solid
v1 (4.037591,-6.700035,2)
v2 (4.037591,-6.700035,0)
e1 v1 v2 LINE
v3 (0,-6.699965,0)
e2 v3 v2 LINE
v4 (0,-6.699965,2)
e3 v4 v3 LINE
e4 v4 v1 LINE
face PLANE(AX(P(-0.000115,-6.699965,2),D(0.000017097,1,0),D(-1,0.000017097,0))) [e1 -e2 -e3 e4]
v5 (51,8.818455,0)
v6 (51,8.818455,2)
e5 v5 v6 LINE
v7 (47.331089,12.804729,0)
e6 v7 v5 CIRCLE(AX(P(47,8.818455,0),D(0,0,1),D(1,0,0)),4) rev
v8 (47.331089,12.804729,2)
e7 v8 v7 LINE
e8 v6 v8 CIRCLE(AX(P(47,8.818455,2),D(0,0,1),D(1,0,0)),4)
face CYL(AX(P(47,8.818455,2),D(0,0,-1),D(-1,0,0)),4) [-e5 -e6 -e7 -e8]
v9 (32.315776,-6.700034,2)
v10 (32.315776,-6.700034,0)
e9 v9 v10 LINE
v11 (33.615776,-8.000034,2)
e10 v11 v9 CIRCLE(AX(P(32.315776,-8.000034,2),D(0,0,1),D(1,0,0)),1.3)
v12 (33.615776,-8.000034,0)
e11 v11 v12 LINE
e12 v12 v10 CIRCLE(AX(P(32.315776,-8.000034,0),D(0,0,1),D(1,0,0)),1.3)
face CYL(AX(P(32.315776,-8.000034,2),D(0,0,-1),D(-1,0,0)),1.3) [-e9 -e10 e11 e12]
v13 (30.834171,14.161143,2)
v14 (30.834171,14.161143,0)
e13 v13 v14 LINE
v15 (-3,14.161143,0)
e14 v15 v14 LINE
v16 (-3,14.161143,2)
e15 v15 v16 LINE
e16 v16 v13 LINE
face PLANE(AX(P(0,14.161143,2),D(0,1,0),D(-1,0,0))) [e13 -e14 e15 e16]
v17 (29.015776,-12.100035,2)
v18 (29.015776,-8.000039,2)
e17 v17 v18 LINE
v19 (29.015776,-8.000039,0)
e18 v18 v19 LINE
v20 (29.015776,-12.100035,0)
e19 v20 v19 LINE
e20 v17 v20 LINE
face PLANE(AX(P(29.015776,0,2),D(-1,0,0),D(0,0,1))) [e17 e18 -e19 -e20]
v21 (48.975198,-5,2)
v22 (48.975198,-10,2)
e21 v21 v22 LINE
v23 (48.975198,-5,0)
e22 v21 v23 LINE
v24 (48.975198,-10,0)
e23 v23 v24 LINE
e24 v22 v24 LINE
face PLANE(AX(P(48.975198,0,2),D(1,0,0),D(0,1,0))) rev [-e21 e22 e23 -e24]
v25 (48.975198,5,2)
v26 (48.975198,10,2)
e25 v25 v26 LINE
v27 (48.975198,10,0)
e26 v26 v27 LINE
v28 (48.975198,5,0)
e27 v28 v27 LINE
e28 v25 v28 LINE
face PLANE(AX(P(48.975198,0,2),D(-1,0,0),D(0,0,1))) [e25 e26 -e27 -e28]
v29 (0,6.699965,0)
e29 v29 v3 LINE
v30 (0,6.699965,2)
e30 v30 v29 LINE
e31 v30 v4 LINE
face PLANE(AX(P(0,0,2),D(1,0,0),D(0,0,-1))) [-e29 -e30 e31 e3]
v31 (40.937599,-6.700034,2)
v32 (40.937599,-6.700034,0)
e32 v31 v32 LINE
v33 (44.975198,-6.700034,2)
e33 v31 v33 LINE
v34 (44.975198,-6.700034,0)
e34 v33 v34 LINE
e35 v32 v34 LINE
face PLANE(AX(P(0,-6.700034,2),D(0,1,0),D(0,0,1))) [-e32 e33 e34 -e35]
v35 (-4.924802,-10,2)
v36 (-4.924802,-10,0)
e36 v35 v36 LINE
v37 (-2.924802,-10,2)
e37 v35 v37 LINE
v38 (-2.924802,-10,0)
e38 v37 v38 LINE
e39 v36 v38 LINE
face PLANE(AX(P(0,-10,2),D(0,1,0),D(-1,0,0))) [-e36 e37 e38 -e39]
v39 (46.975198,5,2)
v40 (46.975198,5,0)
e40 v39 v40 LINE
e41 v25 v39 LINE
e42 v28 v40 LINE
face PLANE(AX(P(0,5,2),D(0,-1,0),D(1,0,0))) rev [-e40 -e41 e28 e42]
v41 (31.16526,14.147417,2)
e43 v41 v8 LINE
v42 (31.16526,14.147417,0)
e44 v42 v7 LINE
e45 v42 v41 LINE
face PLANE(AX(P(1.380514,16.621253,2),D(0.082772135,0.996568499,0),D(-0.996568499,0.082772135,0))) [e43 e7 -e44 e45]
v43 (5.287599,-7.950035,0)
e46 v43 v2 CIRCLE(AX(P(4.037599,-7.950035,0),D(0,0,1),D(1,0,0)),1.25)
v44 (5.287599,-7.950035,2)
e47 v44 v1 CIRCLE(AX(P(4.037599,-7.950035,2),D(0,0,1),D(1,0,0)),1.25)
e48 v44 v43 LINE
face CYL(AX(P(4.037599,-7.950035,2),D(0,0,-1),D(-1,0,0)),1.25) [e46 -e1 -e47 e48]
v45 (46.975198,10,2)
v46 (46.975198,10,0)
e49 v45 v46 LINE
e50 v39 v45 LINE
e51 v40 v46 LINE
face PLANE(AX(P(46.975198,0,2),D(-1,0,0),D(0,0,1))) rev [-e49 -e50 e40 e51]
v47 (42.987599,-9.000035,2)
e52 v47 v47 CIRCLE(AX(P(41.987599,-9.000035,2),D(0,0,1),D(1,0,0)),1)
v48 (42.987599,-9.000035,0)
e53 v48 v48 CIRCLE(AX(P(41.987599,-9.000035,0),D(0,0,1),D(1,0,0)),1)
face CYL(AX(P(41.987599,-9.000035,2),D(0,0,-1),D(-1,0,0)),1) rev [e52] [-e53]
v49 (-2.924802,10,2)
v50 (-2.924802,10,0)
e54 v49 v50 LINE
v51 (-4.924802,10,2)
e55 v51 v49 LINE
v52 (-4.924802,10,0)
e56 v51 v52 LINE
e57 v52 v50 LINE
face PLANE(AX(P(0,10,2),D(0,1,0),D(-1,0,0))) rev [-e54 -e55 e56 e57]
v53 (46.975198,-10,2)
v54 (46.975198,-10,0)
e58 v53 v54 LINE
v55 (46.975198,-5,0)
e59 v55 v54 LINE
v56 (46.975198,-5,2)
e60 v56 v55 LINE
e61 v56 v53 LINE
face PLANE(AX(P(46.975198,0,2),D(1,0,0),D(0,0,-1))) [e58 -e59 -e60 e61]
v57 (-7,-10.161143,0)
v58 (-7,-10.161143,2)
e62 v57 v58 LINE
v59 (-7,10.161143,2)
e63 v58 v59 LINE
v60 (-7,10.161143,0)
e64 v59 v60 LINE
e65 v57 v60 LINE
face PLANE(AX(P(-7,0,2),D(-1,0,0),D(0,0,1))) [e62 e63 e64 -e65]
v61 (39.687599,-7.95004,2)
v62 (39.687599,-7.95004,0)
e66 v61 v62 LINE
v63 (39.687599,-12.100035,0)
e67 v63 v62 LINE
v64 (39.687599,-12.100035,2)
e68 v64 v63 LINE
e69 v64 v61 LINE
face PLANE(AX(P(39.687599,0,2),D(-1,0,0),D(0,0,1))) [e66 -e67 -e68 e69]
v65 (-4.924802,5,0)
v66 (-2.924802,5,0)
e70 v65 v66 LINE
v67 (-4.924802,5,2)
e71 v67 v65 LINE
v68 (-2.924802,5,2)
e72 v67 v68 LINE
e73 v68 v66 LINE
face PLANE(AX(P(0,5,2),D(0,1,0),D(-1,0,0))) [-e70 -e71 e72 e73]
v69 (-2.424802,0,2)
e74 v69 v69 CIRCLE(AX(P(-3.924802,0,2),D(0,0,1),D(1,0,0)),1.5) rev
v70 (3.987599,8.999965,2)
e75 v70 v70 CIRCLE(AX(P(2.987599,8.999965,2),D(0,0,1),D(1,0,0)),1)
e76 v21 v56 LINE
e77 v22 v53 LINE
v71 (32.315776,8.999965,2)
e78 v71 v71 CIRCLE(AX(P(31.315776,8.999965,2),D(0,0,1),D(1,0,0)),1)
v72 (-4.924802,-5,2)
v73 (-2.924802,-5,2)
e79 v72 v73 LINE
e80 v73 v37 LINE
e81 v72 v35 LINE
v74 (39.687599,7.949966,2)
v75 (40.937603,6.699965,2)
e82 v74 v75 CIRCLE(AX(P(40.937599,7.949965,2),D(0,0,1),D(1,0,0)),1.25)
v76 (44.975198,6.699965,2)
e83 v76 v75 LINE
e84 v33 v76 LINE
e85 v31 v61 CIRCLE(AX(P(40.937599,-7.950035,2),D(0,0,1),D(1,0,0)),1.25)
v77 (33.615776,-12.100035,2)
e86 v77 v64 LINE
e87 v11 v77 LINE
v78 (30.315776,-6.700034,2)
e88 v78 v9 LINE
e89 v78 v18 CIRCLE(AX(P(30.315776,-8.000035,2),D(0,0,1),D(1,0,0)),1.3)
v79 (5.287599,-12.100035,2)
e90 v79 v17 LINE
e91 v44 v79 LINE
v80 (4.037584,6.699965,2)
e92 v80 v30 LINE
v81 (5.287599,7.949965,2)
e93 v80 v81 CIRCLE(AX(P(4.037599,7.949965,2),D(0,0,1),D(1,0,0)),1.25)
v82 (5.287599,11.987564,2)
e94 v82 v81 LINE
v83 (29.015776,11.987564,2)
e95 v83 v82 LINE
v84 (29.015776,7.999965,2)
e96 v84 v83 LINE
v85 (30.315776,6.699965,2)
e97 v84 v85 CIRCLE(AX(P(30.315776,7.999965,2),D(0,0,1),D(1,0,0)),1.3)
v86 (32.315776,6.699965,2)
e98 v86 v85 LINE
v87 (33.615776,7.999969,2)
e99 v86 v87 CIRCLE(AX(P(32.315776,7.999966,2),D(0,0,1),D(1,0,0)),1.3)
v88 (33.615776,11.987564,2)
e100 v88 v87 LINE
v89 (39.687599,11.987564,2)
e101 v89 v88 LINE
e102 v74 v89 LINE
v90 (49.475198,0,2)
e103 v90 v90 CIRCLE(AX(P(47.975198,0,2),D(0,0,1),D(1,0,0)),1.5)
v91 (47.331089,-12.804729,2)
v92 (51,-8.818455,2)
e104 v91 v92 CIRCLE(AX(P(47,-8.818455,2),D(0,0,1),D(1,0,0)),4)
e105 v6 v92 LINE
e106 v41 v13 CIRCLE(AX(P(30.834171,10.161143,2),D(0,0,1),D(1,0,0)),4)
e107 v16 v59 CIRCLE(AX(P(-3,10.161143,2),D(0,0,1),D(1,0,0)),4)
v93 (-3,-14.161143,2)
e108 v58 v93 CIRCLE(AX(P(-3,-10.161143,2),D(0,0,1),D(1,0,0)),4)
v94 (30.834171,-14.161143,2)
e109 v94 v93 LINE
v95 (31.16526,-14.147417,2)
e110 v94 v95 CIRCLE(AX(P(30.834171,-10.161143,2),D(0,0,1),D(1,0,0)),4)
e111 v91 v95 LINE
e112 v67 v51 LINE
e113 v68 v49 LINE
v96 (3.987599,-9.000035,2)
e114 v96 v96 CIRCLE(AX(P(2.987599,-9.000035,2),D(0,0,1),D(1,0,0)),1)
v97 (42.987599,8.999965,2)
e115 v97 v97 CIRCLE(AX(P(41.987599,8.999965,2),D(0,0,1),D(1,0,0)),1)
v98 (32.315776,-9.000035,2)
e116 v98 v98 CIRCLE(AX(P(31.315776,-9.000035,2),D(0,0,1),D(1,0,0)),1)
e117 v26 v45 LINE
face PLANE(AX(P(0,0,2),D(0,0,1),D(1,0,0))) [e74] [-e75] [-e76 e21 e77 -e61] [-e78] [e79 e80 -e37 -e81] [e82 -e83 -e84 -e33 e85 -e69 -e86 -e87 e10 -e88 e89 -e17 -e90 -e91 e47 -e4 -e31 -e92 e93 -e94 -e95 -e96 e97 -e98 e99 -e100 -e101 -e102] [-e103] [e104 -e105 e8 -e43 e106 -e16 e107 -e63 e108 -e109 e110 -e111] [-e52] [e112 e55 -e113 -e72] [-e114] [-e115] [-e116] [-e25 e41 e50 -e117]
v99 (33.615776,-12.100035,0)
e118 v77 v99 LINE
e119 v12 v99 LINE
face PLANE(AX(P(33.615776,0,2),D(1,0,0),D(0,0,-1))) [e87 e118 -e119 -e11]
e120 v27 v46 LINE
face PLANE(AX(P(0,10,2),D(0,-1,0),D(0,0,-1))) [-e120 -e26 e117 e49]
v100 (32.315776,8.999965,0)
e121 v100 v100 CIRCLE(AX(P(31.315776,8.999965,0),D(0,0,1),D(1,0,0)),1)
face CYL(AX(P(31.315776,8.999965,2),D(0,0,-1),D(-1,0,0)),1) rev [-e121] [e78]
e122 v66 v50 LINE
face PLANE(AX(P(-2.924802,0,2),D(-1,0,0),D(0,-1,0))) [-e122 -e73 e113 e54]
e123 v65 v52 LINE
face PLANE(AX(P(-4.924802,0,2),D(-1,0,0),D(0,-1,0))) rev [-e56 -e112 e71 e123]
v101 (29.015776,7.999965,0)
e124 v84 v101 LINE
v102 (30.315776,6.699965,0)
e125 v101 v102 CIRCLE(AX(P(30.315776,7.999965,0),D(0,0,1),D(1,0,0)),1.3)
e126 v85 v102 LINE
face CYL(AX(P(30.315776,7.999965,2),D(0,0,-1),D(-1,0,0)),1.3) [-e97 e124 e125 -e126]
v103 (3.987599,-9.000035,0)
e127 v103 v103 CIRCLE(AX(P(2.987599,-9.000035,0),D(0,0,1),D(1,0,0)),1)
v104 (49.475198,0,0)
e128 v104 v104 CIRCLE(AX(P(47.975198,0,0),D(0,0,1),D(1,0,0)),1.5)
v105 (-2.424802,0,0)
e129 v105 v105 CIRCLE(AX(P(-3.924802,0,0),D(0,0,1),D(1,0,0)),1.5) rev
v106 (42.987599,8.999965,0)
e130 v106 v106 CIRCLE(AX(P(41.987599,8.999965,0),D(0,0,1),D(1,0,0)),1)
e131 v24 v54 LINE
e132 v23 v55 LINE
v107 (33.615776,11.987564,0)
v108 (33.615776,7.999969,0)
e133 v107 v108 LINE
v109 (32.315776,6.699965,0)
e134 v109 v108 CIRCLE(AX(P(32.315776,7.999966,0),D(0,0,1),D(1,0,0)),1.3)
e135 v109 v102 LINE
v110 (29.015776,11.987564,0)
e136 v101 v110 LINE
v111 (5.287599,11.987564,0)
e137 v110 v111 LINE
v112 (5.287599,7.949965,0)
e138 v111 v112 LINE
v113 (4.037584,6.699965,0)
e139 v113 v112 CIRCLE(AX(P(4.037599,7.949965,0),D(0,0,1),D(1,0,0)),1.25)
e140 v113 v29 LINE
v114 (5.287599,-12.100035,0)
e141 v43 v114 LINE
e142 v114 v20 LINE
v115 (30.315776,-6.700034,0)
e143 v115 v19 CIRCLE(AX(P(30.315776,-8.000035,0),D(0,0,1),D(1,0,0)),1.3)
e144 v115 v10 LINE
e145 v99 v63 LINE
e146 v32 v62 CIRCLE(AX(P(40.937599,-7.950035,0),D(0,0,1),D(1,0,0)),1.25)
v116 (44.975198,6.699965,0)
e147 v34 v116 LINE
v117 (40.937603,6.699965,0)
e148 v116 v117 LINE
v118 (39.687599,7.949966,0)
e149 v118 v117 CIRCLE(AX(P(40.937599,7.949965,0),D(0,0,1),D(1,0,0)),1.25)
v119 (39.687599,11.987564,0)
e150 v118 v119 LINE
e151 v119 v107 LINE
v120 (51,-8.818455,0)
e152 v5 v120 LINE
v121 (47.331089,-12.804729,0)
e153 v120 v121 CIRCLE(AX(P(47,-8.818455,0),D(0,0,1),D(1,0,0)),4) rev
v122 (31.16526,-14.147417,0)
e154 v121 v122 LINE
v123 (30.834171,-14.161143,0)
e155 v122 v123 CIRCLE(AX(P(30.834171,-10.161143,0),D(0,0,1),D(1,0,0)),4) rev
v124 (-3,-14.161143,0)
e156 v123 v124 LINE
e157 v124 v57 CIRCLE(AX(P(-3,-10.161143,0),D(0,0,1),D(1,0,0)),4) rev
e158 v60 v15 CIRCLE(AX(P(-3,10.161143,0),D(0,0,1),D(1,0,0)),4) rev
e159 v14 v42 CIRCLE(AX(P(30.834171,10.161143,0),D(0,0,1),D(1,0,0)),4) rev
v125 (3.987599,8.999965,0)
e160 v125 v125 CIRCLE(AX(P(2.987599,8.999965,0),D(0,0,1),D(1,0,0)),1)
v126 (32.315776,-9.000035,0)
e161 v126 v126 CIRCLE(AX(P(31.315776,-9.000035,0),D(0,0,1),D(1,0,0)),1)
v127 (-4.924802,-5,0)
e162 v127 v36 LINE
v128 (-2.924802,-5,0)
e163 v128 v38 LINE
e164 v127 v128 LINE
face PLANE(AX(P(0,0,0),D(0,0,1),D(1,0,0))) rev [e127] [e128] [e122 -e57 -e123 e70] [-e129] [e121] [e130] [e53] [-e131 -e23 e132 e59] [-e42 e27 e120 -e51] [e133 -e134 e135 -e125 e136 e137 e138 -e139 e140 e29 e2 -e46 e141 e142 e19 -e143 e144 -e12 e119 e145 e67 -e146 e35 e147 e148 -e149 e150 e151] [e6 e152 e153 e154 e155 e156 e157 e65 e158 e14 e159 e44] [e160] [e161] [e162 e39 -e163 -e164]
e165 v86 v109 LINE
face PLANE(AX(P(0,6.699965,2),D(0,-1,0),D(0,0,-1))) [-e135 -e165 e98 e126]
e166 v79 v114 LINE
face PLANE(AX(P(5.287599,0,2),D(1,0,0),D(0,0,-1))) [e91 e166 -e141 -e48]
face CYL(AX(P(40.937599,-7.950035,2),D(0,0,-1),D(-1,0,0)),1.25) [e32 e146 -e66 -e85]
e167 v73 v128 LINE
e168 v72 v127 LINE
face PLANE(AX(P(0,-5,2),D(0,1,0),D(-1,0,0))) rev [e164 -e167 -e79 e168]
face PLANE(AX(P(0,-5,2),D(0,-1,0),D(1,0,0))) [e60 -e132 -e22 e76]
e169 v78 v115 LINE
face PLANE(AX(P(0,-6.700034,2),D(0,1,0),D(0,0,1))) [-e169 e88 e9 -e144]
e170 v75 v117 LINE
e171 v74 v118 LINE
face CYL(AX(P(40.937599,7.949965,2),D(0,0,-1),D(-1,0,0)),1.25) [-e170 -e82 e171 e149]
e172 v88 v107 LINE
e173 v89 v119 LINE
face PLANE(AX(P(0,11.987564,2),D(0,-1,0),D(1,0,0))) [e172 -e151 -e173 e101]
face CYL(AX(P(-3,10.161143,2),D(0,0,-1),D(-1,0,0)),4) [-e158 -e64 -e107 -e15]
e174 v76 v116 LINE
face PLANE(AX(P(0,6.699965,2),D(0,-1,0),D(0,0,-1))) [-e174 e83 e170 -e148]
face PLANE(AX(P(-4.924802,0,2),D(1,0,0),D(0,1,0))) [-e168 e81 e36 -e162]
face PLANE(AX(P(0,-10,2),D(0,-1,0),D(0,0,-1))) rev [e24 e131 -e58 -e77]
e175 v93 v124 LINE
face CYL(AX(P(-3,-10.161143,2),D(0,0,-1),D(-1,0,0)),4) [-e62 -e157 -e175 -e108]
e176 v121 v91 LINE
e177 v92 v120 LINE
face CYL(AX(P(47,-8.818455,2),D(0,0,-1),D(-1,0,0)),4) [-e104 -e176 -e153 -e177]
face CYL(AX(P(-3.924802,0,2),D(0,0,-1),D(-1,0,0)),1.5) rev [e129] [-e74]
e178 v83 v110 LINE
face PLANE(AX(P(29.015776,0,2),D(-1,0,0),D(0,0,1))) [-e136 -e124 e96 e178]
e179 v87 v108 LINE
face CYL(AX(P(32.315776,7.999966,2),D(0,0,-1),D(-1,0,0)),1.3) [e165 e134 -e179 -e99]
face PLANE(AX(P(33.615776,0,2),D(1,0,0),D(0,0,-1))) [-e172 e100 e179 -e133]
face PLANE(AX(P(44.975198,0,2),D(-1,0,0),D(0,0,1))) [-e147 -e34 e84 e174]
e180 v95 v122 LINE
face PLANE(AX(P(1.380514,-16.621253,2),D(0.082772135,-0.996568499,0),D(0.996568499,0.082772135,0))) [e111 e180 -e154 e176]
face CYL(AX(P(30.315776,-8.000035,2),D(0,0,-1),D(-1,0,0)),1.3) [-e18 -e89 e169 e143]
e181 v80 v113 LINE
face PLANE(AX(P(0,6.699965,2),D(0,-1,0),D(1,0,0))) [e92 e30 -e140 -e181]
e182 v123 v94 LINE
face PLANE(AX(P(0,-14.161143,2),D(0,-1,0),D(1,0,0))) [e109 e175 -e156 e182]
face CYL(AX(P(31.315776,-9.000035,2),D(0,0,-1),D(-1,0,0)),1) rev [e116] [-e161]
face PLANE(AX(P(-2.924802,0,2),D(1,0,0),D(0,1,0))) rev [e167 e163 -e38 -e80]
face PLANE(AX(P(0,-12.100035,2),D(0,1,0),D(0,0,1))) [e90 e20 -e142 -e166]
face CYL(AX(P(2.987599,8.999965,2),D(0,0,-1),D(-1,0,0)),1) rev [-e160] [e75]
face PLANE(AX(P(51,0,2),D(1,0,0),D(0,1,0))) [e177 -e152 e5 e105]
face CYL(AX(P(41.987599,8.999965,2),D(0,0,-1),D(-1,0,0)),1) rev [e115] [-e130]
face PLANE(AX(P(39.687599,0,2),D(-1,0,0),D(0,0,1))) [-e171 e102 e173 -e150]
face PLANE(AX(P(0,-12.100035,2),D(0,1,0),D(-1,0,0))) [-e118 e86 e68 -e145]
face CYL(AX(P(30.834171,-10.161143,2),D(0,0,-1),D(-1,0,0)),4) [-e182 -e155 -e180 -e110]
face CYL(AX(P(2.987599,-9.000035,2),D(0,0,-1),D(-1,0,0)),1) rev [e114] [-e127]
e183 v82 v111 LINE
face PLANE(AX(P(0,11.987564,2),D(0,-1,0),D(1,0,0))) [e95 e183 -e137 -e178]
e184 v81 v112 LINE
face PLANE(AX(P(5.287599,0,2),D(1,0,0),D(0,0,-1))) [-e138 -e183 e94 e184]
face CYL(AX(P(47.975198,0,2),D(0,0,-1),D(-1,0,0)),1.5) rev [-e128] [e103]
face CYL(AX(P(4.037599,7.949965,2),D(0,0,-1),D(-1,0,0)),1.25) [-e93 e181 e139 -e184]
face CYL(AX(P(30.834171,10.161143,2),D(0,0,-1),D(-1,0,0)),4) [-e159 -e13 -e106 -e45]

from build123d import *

# Parameters (mm, degrees)
BOSS_EXTRU_1_OUTLINE_W   = 2
BOSS_EXTRU_1_OUTLINE_H   = 5
BOSS_EXTRU_1_OUTLINE_R   = 1
BOSS_EXTRU_1_OUTLINE_R_2 = 1.5
BOSS_EXTRU_1_DEPTH       = 2
FILLET1_R                = 4


# Read off the part's stored shape, not the designer's step: Boss.-Extru.1
with BuildPart() as part:
    # Boss.-Extru.1 outline → Boss.-Extru.1 (new body)
    with BuildSketch(Plane.XY):
        Polygon((-7, -14.16114291), (31, -14.16114291), (51, -12.5), (51, 12.5), (31, 14.16114291), (-7, 14.16114291), align=None)
        with Locations((-3.924802108, -7.5)):
            Rectangle(BOSS_EXTRU_1_OUTLINE_W, BOSS_EXTRU_1_OUTLINE_H, mode=Mode.SUBTRACT)
        with Locations((2.98759897, -9.000034515)):
            Circle(BOSS_EXTRU_1_OUTLINE_R, mode=Mode.SUBTRACT)
        with Locations((31.315776387, -9.000034515)):
            Circle(BOSS_EXTRU_1_OUTLINE_R, mode=Mode.SUBTRACT)
        with Locations((41.98759897, -9.000034515)):
            Circle(BOSS_EXTRU_1_OUTLINE_R, mode=Mode.SUBTRACT)
        with Locations((47.975197892, -7.5)):
            Rectangle(BOSS_EXTRU_1_OUTLINE_W, BOSS_EXTRU_1_OUTLINE_H, mode=Mode.SUBTRACT)
        with BuildLine():
            ThreePointArc((33.615776345, -8.000034132), (33.23501504, -7.080795537), (32.315776344, -6.700034473))
            Line((32.315776344, -6.700034473), (30.315776345, -6.700034473))
            ThreePointArc((30.315776345, -6.700034473), (29.396536008, -7.080797161), (29.015776303, -8.000038733))
            Line((29.015776303, -8.000038733), (29.015776303, -12.100034515))
            Line((29.015776303, -12.100034515), (5.28759897, -12.100034515))
            Line((5.28759897, -12.100034515), (5.28759897, -7.950034515))
            ThreePointArc((5.28759897, -7.950034515), (4.921479782, -7.066148374), (4.037591434, -6.700034515))
            Line((4.037591434, -6.700034515), (0, -6.699965485))
            Line((0, -6.699965485), (0, 6.699965485))
            Line((0, 6.699965485), (4.03758425, 6.699965485))
            ThreePointArc((4.03758425, 6.699965485), (4.921477242, 7.066076805), (5.28759897, 7.949965485))
            Line((5.28759897, 7.949965485), (5.28759897, 11.987564455))
            Line((5.28759897, 11.987564455), (29.015776399, 11.987564455))
            Line((29.015776399, 11.987564455), (29.015776399, 7.999965373))
            ThreePointArc((29.015776399, 7.999965373), (29.396537621, 7.080726637), (30.31577639, 6.699965495))
            Line((30.31577639, 6.699965495), (32.315776389, 6.699965495))
            ThreePointArc((32.315776389, 6.699965495), (33.235016597, 7.080728053), (33.615776432, 7.999969389))
            Line((33.615776432, 7.999969389), (33.615776432, 11.987564455))
            Line((33.615776432, 11.987564455), (39.68759897, 11.987564455))
            Line((39.68759897, 11.987564455), (39.68759897, 7.949965701))
            ThreePointArc((39.68759897, 7.949965701), (40.053716981, 7.066080502), (40.9376034, 6.699965437))
            Line((40.9376034, 6.699965437), (44.975197892, 6.699965437))
            Line((44.975197892, 6.699965437), (44.975197892, -6.70003437))
            Line((44.975197892, -6.70003437), (40.937599481, -6.70003437))
            ThreePointArc((40.937599481, -6.70003437), (40.053713738, -7.066152541), (39.687598777, -7.950039613))
            Line((39.687598777, -7.950039613), (39.687598777, -12.100034515))
            Line((39.687598777, -12.100034515), (33.615776345, -12.100034515))
            Line((33.615776345, -12.100034515), (33.615776345, -8.000034132))
        make_face(mode=Mode.SUBTRACT)
        with Locations((-3.924802108, 0)):
            Circle(BOSS_EXTRU_1_OUTLINE_R_2, mode=Mode.SUBTRACT)
        with Locations((-3.924802108, 7.5)):
            Rectangle(BOSS_EXTRU_1_OUTLINE_W, BOSS_EXTRU_1_OUTLINE_H, mode=Mode.SUBTRACT)
        with Locations((2.98759897, 8.999965485)):
            Circle(BOSS_EXTRU_1_OUTLINE_R, mode=Mode.SUBTRACT)
        with Locations((47.975197892, 0)):
            Circle(BOSS_EXTRU_1_OUTLINE_R_2, mode=Mode.SUBTRACT)
        with Locations((31.315776387, 8.999965485)):
            Circle(BOSS_EXTRU_1_OUTLINE_R, mode=Mode.SUBTRACT)
        with Locations((41.98759897, 8.999965485)):
            Circle(BOSS_EXTRU_1_OUTLINE_R, mode=Mode.SUBTRACT)
        with Locations((47.975197892, 7.5)):
            Rectangle(BOSS_EXTRU_1_OUTLINE_W, BOSS_EXTRU_1_OUTLINE_H, mode=Mode.SUBTRACT)
    extrude(amount=BOSS_EXTRU_1_DEPTH)

    # Fillet1
    # the kernel refuses this fillet: 4 mm, written as the material it takes off along each edge
    with BuildSketch(Plane(origin=(31, -14.16114291, -0.414571976), x_dir=(-1, 0, 0), z_dir=(0, 0, 1)), Plane(origin=(31, 14.16114291, -0.414571976), x_dir=(0.9965684992480803, -0.0827721348427634, 0), z_dir=(0, 0, 1))) as fillet1_piece_1:
        with BuildLine():
            CenterArc((FILLET1_R * 0.0414571976238, -FILLET1_R), FILLET1_R, 90, 4.747926068)
            Line((-FILLET1_R * 0.041314937219, -FILLET1_R * 0.00343150075192), (0, 0))
            Line((0, 0), (FILLET1_R * 0.0414571976238, 0))
        make_face()
    extrude(amount=2.829143952, mode=Mode.SUBTRACT)
    with BuildSketch(Plane(origin=(-7, -14.16114291, -10), x_dir=(1, 0, 0), z_dir=(0, 0, 1))) as fillet1_piece_2:
        with BuildLine():
            CenterArc((FILLET1_R, FILLET1_R), FILLET1_R, 180, 90)
            Line((0, FILLET1_R), (0, 0))
            Line((0, 0), (FILLET1_R, 0))
        make_face()
    extrude(amount=22, mode=Mode.SUBTRACT)
    with BuildSketch(Plane(origin=(-7, 14.16114291, -10), x_dir=(1, 0, 0), z_dir=(0, 0, 1))) as fillet1_piece_3:
        with BuildLine():
            CenterArc((FILLET1_R, -FILLET1_R), FILLET1_R, 90, 90)
            Line((0, -FILLET1_R), (0, 0))
            Line((0, 0), (FILLET1_R, 0))
        make_face()
    extrude(amount=22, mode=Mode.SUBTRACT)
    with BuildSketch(Plane(origin=(51, 12.5, -9.20386171), x_dir=(0, -1, 0), z_dir=(0, 0, 1)), Plane(origin=(51, -12.5, -9.20386171), x_dir=(-0.9965684992480804, -0.08277213484276448, 0), z_dir=(0, 0, 1))) as fillet1_piece_4:
        with BuildLine():
            CenterArc((FILLET1_R * 0.920386170995, -FILLET1_R), FILLET1_R, 90, 85.252073932)
            Line((-FILLET1_R * 0.076182328253, -FILLET1_R * 0.917227865157), (0, 0))
            Line((0, 0), (FILLET1_R * 0.920386170995, 0))
        make_face()
    extrude(amount=20.40772342, mode=Mode.SUBTRACT)


solid = part.part
